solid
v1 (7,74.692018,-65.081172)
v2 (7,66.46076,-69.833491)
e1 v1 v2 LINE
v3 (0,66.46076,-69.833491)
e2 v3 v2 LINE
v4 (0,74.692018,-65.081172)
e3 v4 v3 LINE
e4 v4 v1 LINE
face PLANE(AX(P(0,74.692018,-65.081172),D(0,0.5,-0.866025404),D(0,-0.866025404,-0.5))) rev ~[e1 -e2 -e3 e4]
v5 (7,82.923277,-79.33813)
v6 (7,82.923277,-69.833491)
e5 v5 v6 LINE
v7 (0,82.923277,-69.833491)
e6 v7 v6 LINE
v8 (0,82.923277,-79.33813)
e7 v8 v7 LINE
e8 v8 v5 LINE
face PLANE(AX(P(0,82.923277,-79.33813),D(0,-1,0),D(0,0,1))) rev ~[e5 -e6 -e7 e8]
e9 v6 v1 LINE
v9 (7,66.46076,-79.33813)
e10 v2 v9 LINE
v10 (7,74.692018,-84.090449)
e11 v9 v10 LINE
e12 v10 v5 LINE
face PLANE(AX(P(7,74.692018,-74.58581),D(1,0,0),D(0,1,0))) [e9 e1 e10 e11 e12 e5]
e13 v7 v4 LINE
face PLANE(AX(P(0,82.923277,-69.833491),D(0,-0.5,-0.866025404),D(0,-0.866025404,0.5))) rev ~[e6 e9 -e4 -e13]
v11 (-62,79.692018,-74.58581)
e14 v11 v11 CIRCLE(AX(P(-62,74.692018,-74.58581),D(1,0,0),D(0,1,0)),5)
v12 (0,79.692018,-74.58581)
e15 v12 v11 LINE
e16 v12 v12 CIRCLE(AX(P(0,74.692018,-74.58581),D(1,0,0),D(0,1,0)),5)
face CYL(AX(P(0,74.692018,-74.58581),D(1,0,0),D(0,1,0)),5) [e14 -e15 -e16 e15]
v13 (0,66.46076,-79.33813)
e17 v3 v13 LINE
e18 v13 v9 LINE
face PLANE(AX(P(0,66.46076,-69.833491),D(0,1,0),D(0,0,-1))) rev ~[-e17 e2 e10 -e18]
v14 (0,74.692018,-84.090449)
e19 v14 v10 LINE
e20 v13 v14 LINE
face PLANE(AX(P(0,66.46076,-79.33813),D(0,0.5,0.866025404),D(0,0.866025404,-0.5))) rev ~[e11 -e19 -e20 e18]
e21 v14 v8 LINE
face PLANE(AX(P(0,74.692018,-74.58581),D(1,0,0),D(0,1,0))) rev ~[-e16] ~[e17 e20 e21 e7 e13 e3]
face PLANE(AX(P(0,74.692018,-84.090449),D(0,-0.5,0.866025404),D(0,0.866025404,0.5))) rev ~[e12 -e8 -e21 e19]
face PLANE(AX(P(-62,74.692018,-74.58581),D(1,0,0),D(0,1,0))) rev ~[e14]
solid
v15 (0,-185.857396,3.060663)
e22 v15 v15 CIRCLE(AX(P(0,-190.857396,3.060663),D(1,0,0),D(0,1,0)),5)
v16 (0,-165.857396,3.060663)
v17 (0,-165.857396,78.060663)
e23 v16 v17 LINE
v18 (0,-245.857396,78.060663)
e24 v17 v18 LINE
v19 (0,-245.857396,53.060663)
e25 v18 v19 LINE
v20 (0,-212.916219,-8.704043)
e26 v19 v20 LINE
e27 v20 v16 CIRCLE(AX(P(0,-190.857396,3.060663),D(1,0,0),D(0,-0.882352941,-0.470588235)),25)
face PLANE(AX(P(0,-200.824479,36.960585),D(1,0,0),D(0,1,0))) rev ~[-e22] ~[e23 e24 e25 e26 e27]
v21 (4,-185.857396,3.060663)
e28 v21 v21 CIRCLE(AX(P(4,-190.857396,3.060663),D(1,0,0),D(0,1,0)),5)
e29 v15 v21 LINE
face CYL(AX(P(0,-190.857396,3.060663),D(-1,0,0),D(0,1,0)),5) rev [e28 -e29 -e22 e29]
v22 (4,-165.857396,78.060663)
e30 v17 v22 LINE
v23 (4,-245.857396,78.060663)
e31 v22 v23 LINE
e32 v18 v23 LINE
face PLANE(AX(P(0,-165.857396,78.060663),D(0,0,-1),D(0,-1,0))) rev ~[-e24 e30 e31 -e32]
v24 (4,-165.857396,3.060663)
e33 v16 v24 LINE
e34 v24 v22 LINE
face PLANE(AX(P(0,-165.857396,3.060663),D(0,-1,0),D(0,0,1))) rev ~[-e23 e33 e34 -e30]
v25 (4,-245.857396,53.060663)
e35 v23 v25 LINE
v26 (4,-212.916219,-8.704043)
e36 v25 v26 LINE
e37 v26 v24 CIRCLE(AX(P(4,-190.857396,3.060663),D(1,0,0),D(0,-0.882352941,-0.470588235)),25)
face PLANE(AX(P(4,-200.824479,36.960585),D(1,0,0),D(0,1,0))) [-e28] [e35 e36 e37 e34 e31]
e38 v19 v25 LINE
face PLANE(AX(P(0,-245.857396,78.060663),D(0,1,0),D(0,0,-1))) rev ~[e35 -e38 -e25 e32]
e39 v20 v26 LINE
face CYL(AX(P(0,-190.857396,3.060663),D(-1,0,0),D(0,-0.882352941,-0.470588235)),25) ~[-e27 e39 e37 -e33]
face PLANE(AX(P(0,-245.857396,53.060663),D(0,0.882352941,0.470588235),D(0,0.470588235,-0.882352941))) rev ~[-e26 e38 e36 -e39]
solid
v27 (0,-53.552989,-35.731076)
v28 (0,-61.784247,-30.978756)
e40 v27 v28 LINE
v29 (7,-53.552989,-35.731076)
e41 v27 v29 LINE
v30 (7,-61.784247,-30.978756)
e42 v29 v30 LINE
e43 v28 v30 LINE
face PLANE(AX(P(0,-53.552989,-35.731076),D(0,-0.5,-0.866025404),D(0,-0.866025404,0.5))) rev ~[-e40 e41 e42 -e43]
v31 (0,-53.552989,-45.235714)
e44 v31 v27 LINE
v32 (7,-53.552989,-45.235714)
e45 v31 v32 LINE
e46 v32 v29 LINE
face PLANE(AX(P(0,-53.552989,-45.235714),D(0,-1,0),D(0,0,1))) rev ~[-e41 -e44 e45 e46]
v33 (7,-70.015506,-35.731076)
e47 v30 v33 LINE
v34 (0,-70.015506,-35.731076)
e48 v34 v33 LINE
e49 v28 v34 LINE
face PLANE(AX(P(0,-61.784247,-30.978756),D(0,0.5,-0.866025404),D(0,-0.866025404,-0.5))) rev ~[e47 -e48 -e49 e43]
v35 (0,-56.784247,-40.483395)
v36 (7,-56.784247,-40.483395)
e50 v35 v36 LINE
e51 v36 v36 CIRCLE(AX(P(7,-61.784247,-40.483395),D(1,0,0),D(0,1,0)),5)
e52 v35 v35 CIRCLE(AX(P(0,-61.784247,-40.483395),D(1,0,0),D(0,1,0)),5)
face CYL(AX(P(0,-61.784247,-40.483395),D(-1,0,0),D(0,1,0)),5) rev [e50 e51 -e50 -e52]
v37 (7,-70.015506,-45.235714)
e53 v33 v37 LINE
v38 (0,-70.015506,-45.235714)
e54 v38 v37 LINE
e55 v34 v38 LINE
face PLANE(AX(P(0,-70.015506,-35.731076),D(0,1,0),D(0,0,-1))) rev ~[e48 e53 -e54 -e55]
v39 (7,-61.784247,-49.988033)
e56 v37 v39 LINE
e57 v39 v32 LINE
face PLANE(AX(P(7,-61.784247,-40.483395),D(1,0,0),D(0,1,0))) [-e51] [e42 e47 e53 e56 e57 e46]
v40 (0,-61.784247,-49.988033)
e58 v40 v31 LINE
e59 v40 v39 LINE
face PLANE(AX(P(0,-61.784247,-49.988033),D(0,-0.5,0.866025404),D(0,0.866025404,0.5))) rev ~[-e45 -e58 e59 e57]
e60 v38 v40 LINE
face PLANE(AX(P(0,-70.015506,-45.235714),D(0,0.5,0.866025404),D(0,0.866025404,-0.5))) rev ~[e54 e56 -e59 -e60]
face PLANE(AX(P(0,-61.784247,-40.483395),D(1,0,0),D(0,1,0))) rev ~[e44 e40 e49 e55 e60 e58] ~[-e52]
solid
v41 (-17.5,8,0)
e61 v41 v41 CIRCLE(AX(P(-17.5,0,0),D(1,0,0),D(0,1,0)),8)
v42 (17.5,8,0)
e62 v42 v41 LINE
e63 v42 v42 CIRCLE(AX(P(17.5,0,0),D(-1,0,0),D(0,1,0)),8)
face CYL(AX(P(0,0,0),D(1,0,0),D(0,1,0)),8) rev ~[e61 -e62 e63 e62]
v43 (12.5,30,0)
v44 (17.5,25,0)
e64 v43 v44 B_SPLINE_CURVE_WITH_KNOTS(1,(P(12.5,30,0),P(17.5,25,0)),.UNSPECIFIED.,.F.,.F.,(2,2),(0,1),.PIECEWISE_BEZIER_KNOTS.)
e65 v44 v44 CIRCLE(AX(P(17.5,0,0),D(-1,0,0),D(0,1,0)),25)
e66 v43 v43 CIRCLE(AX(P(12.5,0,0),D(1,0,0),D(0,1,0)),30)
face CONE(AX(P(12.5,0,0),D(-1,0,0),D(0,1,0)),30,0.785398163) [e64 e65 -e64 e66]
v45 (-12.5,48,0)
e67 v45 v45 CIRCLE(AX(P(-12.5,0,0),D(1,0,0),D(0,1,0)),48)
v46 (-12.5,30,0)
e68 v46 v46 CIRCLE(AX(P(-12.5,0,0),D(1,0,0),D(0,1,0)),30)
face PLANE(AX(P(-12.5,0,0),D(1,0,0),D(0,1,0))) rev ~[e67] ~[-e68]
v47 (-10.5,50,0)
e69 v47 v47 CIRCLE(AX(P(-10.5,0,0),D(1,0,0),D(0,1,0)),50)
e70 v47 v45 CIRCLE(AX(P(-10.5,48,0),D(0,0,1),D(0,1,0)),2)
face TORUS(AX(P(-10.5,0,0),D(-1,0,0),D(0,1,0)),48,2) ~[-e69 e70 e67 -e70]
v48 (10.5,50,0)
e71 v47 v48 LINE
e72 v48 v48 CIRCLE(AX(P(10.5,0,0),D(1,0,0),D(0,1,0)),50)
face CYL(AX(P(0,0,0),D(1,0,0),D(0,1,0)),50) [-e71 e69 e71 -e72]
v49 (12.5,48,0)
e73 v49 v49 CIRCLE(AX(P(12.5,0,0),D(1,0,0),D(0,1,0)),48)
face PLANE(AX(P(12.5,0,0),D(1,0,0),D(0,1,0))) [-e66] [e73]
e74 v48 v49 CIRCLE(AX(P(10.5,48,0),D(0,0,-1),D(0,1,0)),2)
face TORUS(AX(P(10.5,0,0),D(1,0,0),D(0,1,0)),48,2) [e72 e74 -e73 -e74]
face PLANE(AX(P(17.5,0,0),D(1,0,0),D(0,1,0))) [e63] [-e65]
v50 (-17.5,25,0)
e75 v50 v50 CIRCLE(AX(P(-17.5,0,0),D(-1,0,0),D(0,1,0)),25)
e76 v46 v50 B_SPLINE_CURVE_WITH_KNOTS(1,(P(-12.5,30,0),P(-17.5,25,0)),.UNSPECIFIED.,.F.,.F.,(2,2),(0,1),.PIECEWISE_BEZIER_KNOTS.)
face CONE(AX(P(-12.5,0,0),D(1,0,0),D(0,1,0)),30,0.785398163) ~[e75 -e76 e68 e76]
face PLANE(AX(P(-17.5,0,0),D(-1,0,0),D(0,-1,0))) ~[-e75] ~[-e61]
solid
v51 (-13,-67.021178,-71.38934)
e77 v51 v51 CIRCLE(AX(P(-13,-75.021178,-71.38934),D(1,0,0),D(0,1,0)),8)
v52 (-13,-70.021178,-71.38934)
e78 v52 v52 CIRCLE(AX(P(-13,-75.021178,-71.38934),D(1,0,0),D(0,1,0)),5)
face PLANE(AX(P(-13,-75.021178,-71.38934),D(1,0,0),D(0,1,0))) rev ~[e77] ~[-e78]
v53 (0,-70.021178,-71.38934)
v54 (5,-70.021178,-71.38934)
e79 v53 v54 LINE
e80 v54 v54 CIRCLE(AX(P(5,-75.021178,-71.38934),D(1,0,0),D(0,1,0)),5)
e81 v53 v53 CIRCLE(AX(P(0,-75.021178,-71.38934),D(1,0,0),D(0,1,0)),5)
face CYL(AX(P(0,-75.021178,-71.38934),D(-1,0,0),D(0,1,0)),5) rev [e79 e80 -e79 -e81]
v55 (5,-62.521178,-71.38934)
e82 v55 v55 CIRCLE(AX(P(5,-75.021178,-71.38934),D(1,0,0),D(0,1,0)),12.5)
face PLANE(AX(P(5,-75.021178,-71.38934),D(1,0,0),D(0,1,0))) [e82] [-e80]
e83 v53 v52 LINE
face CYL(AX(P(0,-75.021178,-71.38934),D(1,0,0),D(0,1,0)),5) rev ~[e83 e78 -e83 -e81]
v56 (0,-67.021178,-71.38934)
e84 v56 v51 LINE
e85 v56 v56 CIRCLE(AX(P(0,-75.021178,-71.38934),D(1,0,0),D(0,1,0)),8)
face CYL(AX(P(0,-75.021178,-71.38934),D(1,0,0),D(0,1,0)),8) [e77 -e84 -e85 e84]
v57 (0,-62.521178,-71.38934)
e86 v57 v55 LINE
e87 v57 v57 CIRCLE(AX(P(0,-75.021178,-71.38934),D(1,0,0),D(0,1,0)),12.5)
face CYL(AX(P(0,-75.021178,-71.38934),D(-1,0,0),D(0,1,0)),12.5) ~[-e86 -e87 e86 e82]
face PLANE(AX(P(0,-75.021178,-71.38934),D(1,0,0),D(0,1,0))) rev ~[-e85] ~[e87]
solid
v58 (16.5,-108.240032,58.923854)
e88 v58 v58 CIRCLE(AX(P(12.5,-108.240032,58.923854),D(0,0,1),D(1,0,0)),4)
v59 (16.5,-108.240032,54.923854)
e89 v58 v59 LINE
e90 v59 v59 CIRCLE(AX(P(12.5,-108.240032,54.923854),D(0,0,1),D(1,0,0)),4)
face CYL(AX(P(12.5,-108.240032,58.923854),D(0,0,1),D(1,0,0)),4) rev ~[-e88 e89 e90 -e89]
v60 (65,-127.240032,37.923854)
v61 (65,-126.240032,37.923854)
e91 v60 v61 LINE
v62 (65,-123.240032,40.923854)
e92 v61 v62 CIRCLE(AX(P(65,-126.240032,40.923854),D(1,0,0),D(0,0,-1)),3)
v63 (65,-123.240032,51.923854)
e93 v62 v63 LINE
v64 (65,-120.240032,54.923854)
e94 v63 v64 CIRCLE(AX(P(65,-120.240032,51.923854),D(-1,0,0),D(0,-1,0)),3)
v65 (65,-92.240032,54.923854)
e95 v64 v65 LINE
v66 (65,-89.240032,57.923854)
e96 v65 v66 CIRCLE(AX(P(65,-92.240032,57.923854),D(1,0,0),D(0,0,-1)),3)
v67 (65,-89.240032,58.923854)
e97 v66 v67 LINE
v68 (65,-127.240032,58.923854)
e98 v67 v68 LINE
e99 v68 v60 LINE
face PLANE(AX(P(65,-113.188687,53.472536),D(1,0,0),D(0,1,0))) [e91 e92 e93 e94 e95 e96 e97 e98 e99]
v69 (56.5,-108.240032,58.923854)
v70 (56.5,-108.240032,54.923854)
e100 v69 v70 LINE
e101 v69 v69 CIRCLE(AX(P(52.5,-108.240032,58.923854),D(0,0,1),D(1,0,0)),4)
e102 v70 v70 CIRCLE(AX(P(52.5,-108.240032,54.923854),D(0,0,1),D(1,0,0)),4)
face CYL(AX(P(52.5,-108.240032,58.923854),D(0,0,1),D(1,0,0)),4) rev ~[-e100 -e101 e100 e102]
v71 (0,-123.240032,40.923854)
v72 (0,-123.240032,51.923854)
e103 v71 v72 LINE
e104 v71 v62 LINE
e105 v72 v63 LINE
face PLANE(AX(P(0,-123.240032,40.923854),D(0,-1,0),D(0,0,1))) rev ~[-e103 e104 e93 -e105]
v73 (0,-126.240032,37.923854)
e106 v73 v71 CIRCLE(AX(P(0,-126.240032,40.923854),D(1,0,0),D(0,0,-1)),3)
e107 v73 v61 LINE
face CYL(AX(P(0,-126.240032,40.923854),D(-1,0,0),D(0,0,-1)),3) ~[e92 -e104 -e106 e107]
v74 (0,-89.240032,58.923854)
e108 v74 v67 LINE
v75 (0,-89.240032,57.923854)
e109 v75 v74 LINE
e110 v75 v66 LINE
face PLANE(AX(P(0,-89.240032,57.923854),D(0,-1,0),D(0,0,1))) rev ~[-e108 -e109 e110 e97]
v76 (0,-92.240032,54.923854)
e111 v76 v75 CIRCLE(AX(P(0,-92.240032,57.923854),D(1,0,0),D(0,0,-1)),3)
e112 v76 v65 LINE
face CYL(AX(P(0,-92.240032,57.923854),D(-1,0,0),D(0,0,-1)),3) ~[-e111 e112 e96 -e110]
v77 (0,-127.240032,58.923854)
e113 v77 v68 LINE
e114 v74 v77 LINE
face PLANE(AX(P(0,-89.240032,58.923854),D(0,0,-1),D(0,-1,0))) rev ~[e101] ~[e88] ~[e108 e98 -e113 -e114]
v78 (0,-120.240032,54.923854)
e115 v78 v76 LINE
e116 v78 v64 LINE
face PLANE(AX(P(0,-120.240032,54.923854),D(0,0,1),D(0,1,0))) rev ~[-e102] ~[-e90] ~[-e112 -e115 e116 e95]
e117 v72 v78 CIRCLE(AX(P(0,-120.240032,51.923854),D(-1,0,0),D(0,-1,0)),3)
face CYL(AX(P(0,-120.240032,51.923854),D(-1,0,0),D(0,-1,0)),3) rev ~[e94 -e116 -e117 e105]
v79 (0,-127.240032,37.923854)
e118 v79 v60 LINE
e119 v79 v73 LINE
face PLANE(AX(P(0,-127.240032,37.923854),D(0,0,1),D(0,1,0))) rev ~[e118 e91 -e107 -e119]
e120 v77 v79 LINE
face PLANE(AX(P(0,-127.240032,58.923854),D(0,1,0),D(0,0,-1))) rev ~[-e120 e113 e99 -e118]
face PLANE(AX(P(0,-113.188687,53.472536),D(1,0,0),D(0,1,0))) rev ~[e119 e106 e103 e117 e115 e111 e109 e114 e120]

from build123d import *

# Parameters (mm, degrees)
F0_R          = 50
F1_DEPTH      = 12.5
F2_R          = 30
F3_DEPTH      = 5
F3_TAPER      = 45
F4_R          = 2
F5_R          = 8
F6_DEPTH      = 17.5010001
F6_DEPTH_BACK = 17.5010001
F7_R          = 12.5
F7_R_2        = 8
F7_R_3        = 5
F8_DEPTH      = 5
F9_DEPTH      = 13
F10_R         = 5
F11_DEPTH     = 7
F12_DEPTH     = 62
F13_R         = 5
F14_DEPTH     = 7
F15_R         = 5
F16_DEPTH     = 4
F18_DEPTH     = 65
F19_R         = 4
F20_DEPTH     = 25


# Not quite as in the source:
# - a pattern or mirror of a feature is missing from the dataset's text; its kind, count and spacing are read off the source's solid


with BuildPart() as f1:
    # F0 (on Right) → F1 (new body, symmetric)
    with BuildSketch(Plane.YZ):
        Circle(F0_R)
    extrude(amount=F1_DEPTH, both=True)

    # F2 (on face) → F3 (join)
    with BuildSketch(Plane.YZ.offset(12.5)):
        Circle(F2_R)
    f3 = extrude(amount=F3_DEPTH, taper=F3_TAPER)

    # F3_copies: F3 across plane
    add(f3.mirror(Plane(origin=(0, 0, 0), x_dir=(0, 0, -1), z_dir=(-1, 0, 0))))

    # F4
    f4_edges = [f1.edges().sort_by_distance(p)[0] for p in [
        (12.5, -50, 0),
        (-12.5, -50, 0),
    ]]
    fillet(f4_edges, radius=F4_R)

    # F5 (on Right) → F6 (cut, two sides)
    with BuildSketch(Plane.YZ) as f6_sk:
        Circle(F5_R)
    extrude(amount=-F6_DEPTH, mode=Mode.SUBTRACT)
    extrude(f6_sk.sketch, amount=F6_DEPTH_BACK, mode=Mode.SUBTRACT)


with BuildPart() as f8:
    # F7 (on Right) → F8 (new body)
    with BuildSketch(Plane.YZ):
        with Locations((-75.0211775303, -71.3893398643)):
            Circle(F7_R)
        with Locations((-75.0211775303, -71.3893398643)):
            Circle(F7_R_2, mode=Mode.SUBTRACT)
        with Locations((-75.0211775303, -71.3893398643)):
            Circle(F7_R_2)
        with Locations((-75.0211775303, -71.3893398643)):
            Circle(F7_R_3, mode=Mode.SUBTRACT)
    extrude(amount=F8_DEPTH)

    # F7 (on Right) → F9 (join)
    with BuildSketch(Plane.YZ):
        with Locations((-75.0211775303, -71.3893398643)):
            Circle(F7_R_2)
        with Locations((-75.0211775303, -71.3893398643)):
            Circle(F7_R_3, mode=Mode.SUBTRACT)
    extrude(amount=-F9_DEPTH)


with BuildPart() as f11:
    # F10 (on Right) → F11 (new body)
    with BuildSketch(Plane.YZ):
        Polygon((82.9232768221, -69.8334909976), (74.6920183301, -65.0811716914), (66.4607598381, -69.8334909976), (66.4607598381, -79.3381296098), (74.6920183301, -84.090448916), (82.9232768221, -79.3381296098), align=None)
        with Locations((74.6920183301, -74.5858103037)):
            Circle(F10_R, mode=Mode.SUBTRACT)
        with Locations((74.6920183301, -74.5858103037)):
            Circle(F10_R)
    extrude(amount=F11_DEPTH)

    # F10 (on Right) → F12 (join)
    with BuildSketch(Plane.YZ):
        with Locations((74.6920183301, -74.5858103037)):
            Circle(F10_R)
    extrude(amount=-F12_DEPTH)


with BuildPart() as f14:
    # F13 (on Right) → F14 (new body)
    with BuildSketch(Plane.YZ):
        Polygon((-53.5529885899, -35.7310755062), (-61.784247082, -30.9787562001), (-70.015505574, -35.7310755062), (-70.015505574, -45.2357141185), (-61.784247082, -49.9880334246), (-53.5529885899, -45.2357141185), align=None)
        with Locations((-61.784247082, -40.4833948123)):
            Circle(F13_R, mode=Mode.SUBTRACT)
    extrude(amount=F14_DEPTH)


with BuildPart() as f16:
    # F15 (on Right) → F16 (new body)
    with BuildSketch(Plane.YZ):
        with BuildLine():
            Line((-245.8573955297, 53.0606626533), (-212.9162190592, -8.7040432291))
            ThreePointArc((-212.9162190592, -8.7040432291), (-184.7940049038, -21.1928998503), (-165.8573955297, 3.0606626533))
            Line((-165.8573955297, 3.0606626533), (-165.8573955297, 78.0606626533))
            Line((-165.8573955297, 78.0606626533), (-245.8573955297, 78.0606626533))
            Line((-245.8573955297, 78.0606626533), (-245.8573955297, 53.0606626533))
        make_face()
        with Locations((-190.8573955297, 3.0606626533)):
            Circle(F15_R, mode=Mode.SUBTRACT)
    extrude(amount=F16_DEPTH)


with BuildPart() as f18:
    # F17 (on Right) → F18 (new body)
    with BuildSketch(Plane.YZ):
        with BuildLine():
            Line((-89.2400319576, 57.9238541722), (-89.2400319576, 58.9238541722))
            Line((-89.2400319576, 58.9238541722), (-127.2400319576, 58.9238541722))
            Line((-127.2400319576, 58.9238541722), (-127.2400319576, 37.9238541722))
            Line((-127.2400319576, 37.9238541722), (-126.2400319576, 37.9238541722))
            ThreePointArc((-126.2400319576, 37.9238541722), (-124.1187116141, 38.8025338287), (-123.2400319576, 40.9238541722))
            Line((-123.2400319576, 40.9238541722), (-123.2400319576, 51.9238541722))
            ThreePointArc((-123.2400319576, 51.9238541722), (-122.3613523012, 54.0451745158), (-120.2400319576, 54.9238541722))
            Line((-120.2400319576, 54.9238541722), (-92.2400319576, 54.9238541722))
            ThreePointArc((-92.2400319576, 54.9238541722), (-90.1187116141, 55.8025338287), (-89.2400319576, 57.9238541722))
        make_face()
    extrude(amount=F18_DEPTH)

    # F19 (on face) → F20 (cut)
    with BuildSketch(Plane.XY.offset(58.9238541722)):
        with Locations((52.5, -108.2400319576)):
            Circle(F19_R)
        with Locations((12.5, -108.2400319576)):
            Circle(F19_R)
    extrude(amount=-F20_DEPTH, mode=Mode.SUBTRACT)


solid = Compound([f1.part, f8.part, f11.part, f14.part, f16.part, f18.part])
